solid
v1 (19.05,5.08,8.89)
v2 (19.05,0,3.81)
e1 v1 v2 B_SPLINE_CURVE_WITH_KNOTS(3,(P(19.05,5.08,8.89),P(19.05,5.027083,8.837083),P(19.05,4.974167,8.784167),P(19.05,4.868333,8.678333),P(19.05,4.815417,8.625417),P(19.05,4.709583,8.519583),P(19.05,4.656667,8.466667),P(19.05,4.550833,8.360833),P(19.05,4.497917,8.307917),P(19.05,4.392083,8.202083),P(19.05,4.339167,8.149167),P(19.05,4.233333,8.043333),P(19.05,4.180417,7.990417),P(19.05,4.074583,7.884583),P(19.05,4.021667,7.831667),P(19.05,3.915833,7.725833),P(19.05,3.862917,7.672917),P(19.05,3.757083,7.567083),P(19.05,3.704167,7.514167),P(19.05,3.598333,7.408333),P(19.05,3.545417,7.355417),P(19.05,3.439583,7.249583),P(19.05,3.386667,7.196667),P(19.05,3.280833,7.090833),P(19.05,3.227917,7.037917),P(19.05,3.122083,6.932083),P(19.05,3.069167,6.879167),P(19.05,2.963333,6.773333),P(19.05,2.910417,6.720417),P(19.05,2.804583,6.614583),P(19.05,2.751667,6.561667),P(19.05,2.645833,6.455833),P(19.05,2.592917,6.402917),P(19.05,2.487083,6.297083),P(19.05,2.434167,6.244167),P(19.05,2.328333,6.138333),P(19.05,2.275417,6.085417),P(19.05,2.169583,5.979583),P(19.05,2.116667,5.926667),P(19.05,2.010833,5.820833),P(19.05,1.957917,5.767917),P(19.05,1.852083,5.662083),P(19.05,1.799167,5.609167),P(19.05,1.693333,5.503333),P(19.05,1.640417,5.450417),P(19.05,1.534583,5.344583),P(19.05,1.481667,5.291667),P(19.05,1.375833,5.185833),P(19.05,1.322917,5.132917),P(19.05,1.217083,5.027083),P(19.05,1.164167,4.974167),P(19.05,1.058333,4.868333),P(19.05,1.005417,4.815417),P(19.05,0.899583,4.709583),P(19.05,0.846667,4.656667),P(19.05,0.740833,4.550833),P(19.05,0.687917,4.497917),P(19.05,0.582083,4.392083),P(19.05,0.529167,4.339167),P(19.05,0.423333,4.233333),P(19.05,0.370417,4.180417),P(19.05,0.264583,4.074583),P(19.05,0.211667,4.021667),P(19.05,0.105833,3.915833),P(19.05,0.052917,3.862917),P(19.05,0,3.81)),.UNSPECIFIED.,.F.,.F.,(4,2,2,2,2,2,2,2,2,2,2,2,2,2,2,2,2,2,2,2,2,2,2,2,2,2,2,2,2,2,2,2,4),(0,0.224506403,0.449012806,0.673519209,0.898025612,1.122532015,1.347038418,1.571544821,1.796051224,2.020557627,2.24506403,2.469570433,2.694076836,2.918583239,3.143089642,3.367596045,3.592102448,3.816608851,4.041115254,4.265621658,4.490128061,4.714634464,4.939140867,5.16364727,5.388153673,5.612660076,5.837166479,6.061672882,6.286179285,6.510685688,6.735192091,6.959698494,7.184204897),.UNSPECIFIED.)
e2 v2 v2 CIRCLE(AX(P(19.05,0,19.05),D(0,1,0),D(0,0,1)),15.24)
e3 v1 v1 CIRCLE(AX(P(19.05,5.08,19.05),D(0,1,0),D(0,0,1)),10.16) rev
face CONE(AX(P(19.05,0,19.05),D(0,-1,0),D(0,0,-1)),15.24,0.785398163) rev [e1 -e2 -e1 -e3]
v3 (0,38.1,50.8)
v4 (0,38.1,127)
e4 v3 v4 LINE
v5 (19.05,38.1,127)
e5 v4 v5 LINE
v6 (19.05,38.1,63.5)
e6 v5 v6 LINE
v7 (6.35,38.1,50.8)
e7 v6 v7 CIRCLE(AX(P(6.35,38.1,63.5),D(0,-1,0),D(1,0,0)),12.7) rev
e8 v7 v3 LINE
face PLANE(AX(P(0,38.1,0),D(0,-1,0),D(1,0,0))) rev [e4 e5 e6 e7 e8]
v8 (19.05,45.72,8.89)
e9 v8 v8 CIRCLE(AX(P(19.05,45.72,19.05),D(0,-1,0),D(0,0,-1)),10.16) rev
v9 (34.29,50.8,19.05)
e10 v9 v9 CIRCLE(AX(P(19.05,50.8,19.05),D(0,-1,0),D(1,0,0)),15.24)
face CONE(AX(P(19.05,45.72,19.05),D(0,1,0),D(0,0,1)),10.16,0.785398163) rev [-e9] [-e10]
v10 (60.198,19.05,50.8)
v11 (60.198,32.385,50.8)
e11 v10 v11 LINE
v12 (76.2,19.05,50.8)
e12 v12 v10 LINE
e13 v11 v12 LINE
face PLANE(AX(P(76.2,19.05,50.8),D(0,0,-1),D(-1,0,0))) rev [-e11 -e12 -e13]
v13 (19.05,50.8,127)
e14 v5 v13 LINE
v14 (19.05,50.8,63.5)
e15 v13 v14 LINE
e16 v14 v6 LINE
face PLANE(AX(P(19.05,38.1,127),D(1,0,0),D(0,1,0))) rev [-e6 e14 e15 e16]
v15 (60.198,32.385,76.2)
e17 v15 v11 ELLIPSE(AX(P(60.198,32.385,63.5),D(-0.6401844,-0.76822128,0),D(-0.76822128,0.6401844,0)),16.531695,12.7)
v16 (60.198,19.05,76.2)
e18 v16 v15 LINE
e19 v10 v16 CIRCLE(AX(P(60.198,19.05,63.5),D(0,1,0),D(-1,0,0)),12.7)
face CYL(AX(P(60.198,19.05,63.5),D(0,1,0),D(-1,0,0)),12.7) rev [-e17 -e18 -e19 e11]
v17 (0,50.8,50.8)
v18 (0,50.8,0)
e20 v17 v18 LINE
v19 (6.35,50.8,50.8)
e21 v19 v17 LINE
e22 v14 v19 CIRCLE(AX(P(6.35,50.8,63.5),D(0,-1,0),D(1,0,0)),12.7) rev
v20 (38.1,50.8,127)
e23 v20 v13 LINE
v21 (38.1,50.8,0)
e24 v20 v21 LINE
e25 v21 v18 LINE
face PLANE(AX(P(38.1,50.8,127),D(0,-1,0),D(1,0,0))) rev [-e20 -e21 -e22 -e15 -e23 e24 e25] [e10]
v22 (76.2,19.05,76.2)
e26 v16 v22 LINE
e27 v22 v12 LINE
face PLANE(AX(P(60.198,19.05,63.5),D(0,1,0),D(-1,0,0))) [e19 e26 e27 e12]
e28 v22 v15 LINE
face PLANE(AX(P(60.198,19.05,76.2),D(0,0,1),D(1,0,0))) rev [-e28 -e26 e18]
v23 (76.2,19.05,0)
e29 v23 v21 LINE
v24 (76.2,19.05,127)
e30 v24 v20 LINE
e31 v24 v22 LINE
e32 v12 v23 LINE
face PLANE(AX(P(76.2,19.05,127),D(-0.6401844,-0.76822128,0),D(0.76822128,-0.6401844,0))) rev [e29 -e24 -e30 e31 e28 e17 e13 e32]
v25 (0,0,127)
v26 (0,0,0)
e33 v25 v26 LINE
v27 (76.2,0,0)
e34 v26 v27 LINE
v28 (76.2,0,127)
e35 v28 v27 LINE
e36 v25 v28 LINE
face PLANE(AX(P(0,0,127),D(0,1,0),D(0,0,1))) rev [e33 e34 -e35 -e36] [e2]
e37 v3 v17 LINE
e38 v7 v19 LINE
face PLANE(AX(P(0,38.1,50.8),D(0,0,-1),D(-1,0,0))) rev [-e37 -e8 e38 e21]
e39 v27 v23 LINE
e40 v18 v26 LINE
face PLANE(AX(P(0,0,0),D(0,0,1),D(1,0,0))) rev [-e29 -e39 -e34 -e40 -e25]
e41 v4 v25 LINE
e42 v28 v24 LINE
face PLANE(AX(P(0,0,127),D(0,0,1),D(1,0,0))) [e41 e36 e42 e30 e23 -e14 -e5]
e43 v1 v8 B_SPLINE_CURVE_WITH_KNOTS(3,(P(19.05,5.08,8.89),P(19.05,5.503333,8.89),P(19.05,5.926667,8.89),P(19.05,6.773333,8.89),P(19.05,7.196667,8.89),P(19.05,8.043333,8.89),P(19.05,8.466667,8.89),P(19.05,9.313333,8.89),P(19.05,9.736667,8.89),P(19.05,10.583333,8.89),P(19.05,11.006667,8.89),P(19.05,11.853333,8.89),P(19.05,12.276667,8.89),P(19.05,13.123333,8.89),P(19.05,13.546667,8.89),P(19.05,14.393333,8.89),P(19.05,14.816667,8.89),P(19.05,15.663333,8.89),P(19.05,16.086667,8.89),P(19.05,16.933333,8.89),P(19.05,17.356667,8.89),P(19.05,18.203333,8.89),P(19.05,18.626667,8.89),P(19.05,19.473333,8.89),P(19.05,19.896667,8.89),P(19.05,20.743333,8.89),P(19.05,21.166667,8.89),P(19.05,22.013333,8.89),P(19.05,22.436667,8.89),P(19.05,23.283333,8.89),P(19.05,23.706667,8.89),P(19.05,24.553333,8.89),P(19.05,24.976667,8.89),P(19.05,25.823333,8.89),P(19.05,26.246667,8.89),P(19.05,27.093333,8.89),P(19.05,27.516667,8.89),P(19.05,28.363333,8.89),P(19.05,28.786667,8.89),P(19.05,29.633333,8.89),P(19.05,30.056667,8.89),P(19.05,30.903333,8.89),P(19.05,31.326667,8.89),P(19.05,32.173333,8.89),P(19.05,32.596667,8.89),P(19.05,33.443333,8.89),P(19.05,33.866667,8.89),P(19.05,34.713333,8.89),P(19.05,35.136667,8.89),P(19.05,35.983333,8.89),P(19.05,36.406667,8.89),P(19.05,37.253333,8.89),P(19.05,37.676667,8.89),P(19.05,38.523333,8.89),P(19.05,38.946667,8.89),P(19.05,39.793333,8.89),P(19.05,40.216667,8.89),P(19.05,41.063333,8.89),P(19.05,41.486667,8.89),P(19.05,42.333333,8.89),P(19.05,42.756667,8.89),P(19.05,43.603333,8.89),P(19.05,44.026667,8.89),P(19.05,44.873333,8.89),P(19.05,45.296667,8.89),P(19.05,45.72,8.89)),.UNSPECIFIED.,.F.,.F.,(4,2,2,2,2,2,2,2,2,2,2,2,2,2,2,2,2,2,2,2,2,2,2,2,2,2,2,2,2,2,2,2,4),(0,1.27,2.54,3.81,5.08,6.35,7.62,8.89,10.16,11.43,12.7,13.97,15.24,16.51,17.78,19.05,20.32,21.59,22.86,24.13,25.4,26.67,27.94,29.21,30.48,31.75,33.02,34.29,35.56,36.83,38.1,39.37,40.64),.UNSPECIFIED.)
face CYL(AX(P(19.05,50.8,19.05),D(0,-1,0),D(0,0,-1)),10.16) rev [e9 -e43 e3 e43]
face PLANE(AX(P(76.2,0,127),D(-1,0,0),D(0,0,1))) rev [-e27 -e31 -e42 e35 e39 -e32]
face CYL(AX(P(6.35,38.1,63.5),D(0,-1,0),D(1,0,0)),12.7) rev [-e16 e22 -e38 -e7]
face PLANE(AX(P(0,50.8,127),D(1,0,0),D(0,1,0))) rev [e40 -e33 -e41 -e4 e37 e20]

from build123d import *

# Parameters (mm, degrees)
BOSS_EXTRUDE1_DEPTH    = 127
CUT_EXTRUDE3_OUTLINE_R = 10.16
CUT_EXTRUDE3_DEPTH     = 50.8
CHAMFER3_SIZE          = 5.08
SKETCH2_W              = 19.05
SKETCH2_H              = 76.2
CUT_EXTRUDE4_DEPTH     = 12.7
FILLET2_R              = 12.7
CUT_EXTRUDE10_DEPTH    = 31.75


# Read off the part's stored shape, not the designer's step: Cut-Extrude3
with BuildPart() as part:
    # Sketch1 → Boss-Extrude1 (new body)
    with BuildSketch(Plane.XY):
        Polygon((0, 0), (76.2, 0), (76.2, 19.05), (38.1, 50.8), (0, 50.8), align=None)
    extrude(amount=BOSS_EXTRUDE1_DEPTH)

    # Cut-Extrude3 outline → Cut-Extrude3 (cut)
    with BuildSketch(Plane(origin=(0, 0, 0), x_dir=(1, 0, 0), z_dir=(0, 1, 0))):
        with Locations((19.05, -19.05)):
            Circle(CUT_EXTRUDE3_OUTLINE_R)
    extrude(amount=CUT_EXTRUDE3_DEPTH, mode=Mode.SUBTRACT)

    # Chamfer3
    chamfer3_edges = [part.edges().sort_by_distance(p)[0] for p in [
        (8.89, 50.8, 19.05),
        (8.89, 0, 19.05),
    ]]
    chamfer(chamfer3_edges, length=CHAMFER3_SIZE)

    # Sketch2 → Cut-Extrude4 (cut)
    with BuildSketch(Plane(origin=(0, 50.8, 0), x_dir=(1, 0, 0), z_dir=(0, 1, 0))):
        with Locations((9.525, -88.9)):
            Rectangle(SKETCH2_W, SKETCH2_H)
    extrude(amount=-CUT_EXTRUDE4_DEPTH, mode=Mode.SUBTRACT)

    # Fillet2
    fillet2_edges = [part.edges().sort_by_distance(p)[0] for p in [
        (19.05, 44.45, 50.8),
    ]]
    fillet(fillet2_edges, radius=FILLET2_R)

    # Sketch3 → Cut-Extrude10 (cut)
    with BuildSketch(Plane(origin=(0, 50.8, 0), x_dir=(1, 0, 0), z_dir=(0, 1, 0))):
        with BuildLine():
            Line((76.2, -50.8), (60.198, -50.8))
            ThreePointArc((60.198, -50.8), (47.498, -63.5), (60.198, -76.2))
            Line((60.198, -76.2), (76.2, -76.2))
            Line((76.2, -76.2), (76.2, -50.8))
        make_face()
    extrude(amount=-CUT_EXTRUDE10_DEPTH, mode=Mode.SUBTRACT)


solid = part.part
